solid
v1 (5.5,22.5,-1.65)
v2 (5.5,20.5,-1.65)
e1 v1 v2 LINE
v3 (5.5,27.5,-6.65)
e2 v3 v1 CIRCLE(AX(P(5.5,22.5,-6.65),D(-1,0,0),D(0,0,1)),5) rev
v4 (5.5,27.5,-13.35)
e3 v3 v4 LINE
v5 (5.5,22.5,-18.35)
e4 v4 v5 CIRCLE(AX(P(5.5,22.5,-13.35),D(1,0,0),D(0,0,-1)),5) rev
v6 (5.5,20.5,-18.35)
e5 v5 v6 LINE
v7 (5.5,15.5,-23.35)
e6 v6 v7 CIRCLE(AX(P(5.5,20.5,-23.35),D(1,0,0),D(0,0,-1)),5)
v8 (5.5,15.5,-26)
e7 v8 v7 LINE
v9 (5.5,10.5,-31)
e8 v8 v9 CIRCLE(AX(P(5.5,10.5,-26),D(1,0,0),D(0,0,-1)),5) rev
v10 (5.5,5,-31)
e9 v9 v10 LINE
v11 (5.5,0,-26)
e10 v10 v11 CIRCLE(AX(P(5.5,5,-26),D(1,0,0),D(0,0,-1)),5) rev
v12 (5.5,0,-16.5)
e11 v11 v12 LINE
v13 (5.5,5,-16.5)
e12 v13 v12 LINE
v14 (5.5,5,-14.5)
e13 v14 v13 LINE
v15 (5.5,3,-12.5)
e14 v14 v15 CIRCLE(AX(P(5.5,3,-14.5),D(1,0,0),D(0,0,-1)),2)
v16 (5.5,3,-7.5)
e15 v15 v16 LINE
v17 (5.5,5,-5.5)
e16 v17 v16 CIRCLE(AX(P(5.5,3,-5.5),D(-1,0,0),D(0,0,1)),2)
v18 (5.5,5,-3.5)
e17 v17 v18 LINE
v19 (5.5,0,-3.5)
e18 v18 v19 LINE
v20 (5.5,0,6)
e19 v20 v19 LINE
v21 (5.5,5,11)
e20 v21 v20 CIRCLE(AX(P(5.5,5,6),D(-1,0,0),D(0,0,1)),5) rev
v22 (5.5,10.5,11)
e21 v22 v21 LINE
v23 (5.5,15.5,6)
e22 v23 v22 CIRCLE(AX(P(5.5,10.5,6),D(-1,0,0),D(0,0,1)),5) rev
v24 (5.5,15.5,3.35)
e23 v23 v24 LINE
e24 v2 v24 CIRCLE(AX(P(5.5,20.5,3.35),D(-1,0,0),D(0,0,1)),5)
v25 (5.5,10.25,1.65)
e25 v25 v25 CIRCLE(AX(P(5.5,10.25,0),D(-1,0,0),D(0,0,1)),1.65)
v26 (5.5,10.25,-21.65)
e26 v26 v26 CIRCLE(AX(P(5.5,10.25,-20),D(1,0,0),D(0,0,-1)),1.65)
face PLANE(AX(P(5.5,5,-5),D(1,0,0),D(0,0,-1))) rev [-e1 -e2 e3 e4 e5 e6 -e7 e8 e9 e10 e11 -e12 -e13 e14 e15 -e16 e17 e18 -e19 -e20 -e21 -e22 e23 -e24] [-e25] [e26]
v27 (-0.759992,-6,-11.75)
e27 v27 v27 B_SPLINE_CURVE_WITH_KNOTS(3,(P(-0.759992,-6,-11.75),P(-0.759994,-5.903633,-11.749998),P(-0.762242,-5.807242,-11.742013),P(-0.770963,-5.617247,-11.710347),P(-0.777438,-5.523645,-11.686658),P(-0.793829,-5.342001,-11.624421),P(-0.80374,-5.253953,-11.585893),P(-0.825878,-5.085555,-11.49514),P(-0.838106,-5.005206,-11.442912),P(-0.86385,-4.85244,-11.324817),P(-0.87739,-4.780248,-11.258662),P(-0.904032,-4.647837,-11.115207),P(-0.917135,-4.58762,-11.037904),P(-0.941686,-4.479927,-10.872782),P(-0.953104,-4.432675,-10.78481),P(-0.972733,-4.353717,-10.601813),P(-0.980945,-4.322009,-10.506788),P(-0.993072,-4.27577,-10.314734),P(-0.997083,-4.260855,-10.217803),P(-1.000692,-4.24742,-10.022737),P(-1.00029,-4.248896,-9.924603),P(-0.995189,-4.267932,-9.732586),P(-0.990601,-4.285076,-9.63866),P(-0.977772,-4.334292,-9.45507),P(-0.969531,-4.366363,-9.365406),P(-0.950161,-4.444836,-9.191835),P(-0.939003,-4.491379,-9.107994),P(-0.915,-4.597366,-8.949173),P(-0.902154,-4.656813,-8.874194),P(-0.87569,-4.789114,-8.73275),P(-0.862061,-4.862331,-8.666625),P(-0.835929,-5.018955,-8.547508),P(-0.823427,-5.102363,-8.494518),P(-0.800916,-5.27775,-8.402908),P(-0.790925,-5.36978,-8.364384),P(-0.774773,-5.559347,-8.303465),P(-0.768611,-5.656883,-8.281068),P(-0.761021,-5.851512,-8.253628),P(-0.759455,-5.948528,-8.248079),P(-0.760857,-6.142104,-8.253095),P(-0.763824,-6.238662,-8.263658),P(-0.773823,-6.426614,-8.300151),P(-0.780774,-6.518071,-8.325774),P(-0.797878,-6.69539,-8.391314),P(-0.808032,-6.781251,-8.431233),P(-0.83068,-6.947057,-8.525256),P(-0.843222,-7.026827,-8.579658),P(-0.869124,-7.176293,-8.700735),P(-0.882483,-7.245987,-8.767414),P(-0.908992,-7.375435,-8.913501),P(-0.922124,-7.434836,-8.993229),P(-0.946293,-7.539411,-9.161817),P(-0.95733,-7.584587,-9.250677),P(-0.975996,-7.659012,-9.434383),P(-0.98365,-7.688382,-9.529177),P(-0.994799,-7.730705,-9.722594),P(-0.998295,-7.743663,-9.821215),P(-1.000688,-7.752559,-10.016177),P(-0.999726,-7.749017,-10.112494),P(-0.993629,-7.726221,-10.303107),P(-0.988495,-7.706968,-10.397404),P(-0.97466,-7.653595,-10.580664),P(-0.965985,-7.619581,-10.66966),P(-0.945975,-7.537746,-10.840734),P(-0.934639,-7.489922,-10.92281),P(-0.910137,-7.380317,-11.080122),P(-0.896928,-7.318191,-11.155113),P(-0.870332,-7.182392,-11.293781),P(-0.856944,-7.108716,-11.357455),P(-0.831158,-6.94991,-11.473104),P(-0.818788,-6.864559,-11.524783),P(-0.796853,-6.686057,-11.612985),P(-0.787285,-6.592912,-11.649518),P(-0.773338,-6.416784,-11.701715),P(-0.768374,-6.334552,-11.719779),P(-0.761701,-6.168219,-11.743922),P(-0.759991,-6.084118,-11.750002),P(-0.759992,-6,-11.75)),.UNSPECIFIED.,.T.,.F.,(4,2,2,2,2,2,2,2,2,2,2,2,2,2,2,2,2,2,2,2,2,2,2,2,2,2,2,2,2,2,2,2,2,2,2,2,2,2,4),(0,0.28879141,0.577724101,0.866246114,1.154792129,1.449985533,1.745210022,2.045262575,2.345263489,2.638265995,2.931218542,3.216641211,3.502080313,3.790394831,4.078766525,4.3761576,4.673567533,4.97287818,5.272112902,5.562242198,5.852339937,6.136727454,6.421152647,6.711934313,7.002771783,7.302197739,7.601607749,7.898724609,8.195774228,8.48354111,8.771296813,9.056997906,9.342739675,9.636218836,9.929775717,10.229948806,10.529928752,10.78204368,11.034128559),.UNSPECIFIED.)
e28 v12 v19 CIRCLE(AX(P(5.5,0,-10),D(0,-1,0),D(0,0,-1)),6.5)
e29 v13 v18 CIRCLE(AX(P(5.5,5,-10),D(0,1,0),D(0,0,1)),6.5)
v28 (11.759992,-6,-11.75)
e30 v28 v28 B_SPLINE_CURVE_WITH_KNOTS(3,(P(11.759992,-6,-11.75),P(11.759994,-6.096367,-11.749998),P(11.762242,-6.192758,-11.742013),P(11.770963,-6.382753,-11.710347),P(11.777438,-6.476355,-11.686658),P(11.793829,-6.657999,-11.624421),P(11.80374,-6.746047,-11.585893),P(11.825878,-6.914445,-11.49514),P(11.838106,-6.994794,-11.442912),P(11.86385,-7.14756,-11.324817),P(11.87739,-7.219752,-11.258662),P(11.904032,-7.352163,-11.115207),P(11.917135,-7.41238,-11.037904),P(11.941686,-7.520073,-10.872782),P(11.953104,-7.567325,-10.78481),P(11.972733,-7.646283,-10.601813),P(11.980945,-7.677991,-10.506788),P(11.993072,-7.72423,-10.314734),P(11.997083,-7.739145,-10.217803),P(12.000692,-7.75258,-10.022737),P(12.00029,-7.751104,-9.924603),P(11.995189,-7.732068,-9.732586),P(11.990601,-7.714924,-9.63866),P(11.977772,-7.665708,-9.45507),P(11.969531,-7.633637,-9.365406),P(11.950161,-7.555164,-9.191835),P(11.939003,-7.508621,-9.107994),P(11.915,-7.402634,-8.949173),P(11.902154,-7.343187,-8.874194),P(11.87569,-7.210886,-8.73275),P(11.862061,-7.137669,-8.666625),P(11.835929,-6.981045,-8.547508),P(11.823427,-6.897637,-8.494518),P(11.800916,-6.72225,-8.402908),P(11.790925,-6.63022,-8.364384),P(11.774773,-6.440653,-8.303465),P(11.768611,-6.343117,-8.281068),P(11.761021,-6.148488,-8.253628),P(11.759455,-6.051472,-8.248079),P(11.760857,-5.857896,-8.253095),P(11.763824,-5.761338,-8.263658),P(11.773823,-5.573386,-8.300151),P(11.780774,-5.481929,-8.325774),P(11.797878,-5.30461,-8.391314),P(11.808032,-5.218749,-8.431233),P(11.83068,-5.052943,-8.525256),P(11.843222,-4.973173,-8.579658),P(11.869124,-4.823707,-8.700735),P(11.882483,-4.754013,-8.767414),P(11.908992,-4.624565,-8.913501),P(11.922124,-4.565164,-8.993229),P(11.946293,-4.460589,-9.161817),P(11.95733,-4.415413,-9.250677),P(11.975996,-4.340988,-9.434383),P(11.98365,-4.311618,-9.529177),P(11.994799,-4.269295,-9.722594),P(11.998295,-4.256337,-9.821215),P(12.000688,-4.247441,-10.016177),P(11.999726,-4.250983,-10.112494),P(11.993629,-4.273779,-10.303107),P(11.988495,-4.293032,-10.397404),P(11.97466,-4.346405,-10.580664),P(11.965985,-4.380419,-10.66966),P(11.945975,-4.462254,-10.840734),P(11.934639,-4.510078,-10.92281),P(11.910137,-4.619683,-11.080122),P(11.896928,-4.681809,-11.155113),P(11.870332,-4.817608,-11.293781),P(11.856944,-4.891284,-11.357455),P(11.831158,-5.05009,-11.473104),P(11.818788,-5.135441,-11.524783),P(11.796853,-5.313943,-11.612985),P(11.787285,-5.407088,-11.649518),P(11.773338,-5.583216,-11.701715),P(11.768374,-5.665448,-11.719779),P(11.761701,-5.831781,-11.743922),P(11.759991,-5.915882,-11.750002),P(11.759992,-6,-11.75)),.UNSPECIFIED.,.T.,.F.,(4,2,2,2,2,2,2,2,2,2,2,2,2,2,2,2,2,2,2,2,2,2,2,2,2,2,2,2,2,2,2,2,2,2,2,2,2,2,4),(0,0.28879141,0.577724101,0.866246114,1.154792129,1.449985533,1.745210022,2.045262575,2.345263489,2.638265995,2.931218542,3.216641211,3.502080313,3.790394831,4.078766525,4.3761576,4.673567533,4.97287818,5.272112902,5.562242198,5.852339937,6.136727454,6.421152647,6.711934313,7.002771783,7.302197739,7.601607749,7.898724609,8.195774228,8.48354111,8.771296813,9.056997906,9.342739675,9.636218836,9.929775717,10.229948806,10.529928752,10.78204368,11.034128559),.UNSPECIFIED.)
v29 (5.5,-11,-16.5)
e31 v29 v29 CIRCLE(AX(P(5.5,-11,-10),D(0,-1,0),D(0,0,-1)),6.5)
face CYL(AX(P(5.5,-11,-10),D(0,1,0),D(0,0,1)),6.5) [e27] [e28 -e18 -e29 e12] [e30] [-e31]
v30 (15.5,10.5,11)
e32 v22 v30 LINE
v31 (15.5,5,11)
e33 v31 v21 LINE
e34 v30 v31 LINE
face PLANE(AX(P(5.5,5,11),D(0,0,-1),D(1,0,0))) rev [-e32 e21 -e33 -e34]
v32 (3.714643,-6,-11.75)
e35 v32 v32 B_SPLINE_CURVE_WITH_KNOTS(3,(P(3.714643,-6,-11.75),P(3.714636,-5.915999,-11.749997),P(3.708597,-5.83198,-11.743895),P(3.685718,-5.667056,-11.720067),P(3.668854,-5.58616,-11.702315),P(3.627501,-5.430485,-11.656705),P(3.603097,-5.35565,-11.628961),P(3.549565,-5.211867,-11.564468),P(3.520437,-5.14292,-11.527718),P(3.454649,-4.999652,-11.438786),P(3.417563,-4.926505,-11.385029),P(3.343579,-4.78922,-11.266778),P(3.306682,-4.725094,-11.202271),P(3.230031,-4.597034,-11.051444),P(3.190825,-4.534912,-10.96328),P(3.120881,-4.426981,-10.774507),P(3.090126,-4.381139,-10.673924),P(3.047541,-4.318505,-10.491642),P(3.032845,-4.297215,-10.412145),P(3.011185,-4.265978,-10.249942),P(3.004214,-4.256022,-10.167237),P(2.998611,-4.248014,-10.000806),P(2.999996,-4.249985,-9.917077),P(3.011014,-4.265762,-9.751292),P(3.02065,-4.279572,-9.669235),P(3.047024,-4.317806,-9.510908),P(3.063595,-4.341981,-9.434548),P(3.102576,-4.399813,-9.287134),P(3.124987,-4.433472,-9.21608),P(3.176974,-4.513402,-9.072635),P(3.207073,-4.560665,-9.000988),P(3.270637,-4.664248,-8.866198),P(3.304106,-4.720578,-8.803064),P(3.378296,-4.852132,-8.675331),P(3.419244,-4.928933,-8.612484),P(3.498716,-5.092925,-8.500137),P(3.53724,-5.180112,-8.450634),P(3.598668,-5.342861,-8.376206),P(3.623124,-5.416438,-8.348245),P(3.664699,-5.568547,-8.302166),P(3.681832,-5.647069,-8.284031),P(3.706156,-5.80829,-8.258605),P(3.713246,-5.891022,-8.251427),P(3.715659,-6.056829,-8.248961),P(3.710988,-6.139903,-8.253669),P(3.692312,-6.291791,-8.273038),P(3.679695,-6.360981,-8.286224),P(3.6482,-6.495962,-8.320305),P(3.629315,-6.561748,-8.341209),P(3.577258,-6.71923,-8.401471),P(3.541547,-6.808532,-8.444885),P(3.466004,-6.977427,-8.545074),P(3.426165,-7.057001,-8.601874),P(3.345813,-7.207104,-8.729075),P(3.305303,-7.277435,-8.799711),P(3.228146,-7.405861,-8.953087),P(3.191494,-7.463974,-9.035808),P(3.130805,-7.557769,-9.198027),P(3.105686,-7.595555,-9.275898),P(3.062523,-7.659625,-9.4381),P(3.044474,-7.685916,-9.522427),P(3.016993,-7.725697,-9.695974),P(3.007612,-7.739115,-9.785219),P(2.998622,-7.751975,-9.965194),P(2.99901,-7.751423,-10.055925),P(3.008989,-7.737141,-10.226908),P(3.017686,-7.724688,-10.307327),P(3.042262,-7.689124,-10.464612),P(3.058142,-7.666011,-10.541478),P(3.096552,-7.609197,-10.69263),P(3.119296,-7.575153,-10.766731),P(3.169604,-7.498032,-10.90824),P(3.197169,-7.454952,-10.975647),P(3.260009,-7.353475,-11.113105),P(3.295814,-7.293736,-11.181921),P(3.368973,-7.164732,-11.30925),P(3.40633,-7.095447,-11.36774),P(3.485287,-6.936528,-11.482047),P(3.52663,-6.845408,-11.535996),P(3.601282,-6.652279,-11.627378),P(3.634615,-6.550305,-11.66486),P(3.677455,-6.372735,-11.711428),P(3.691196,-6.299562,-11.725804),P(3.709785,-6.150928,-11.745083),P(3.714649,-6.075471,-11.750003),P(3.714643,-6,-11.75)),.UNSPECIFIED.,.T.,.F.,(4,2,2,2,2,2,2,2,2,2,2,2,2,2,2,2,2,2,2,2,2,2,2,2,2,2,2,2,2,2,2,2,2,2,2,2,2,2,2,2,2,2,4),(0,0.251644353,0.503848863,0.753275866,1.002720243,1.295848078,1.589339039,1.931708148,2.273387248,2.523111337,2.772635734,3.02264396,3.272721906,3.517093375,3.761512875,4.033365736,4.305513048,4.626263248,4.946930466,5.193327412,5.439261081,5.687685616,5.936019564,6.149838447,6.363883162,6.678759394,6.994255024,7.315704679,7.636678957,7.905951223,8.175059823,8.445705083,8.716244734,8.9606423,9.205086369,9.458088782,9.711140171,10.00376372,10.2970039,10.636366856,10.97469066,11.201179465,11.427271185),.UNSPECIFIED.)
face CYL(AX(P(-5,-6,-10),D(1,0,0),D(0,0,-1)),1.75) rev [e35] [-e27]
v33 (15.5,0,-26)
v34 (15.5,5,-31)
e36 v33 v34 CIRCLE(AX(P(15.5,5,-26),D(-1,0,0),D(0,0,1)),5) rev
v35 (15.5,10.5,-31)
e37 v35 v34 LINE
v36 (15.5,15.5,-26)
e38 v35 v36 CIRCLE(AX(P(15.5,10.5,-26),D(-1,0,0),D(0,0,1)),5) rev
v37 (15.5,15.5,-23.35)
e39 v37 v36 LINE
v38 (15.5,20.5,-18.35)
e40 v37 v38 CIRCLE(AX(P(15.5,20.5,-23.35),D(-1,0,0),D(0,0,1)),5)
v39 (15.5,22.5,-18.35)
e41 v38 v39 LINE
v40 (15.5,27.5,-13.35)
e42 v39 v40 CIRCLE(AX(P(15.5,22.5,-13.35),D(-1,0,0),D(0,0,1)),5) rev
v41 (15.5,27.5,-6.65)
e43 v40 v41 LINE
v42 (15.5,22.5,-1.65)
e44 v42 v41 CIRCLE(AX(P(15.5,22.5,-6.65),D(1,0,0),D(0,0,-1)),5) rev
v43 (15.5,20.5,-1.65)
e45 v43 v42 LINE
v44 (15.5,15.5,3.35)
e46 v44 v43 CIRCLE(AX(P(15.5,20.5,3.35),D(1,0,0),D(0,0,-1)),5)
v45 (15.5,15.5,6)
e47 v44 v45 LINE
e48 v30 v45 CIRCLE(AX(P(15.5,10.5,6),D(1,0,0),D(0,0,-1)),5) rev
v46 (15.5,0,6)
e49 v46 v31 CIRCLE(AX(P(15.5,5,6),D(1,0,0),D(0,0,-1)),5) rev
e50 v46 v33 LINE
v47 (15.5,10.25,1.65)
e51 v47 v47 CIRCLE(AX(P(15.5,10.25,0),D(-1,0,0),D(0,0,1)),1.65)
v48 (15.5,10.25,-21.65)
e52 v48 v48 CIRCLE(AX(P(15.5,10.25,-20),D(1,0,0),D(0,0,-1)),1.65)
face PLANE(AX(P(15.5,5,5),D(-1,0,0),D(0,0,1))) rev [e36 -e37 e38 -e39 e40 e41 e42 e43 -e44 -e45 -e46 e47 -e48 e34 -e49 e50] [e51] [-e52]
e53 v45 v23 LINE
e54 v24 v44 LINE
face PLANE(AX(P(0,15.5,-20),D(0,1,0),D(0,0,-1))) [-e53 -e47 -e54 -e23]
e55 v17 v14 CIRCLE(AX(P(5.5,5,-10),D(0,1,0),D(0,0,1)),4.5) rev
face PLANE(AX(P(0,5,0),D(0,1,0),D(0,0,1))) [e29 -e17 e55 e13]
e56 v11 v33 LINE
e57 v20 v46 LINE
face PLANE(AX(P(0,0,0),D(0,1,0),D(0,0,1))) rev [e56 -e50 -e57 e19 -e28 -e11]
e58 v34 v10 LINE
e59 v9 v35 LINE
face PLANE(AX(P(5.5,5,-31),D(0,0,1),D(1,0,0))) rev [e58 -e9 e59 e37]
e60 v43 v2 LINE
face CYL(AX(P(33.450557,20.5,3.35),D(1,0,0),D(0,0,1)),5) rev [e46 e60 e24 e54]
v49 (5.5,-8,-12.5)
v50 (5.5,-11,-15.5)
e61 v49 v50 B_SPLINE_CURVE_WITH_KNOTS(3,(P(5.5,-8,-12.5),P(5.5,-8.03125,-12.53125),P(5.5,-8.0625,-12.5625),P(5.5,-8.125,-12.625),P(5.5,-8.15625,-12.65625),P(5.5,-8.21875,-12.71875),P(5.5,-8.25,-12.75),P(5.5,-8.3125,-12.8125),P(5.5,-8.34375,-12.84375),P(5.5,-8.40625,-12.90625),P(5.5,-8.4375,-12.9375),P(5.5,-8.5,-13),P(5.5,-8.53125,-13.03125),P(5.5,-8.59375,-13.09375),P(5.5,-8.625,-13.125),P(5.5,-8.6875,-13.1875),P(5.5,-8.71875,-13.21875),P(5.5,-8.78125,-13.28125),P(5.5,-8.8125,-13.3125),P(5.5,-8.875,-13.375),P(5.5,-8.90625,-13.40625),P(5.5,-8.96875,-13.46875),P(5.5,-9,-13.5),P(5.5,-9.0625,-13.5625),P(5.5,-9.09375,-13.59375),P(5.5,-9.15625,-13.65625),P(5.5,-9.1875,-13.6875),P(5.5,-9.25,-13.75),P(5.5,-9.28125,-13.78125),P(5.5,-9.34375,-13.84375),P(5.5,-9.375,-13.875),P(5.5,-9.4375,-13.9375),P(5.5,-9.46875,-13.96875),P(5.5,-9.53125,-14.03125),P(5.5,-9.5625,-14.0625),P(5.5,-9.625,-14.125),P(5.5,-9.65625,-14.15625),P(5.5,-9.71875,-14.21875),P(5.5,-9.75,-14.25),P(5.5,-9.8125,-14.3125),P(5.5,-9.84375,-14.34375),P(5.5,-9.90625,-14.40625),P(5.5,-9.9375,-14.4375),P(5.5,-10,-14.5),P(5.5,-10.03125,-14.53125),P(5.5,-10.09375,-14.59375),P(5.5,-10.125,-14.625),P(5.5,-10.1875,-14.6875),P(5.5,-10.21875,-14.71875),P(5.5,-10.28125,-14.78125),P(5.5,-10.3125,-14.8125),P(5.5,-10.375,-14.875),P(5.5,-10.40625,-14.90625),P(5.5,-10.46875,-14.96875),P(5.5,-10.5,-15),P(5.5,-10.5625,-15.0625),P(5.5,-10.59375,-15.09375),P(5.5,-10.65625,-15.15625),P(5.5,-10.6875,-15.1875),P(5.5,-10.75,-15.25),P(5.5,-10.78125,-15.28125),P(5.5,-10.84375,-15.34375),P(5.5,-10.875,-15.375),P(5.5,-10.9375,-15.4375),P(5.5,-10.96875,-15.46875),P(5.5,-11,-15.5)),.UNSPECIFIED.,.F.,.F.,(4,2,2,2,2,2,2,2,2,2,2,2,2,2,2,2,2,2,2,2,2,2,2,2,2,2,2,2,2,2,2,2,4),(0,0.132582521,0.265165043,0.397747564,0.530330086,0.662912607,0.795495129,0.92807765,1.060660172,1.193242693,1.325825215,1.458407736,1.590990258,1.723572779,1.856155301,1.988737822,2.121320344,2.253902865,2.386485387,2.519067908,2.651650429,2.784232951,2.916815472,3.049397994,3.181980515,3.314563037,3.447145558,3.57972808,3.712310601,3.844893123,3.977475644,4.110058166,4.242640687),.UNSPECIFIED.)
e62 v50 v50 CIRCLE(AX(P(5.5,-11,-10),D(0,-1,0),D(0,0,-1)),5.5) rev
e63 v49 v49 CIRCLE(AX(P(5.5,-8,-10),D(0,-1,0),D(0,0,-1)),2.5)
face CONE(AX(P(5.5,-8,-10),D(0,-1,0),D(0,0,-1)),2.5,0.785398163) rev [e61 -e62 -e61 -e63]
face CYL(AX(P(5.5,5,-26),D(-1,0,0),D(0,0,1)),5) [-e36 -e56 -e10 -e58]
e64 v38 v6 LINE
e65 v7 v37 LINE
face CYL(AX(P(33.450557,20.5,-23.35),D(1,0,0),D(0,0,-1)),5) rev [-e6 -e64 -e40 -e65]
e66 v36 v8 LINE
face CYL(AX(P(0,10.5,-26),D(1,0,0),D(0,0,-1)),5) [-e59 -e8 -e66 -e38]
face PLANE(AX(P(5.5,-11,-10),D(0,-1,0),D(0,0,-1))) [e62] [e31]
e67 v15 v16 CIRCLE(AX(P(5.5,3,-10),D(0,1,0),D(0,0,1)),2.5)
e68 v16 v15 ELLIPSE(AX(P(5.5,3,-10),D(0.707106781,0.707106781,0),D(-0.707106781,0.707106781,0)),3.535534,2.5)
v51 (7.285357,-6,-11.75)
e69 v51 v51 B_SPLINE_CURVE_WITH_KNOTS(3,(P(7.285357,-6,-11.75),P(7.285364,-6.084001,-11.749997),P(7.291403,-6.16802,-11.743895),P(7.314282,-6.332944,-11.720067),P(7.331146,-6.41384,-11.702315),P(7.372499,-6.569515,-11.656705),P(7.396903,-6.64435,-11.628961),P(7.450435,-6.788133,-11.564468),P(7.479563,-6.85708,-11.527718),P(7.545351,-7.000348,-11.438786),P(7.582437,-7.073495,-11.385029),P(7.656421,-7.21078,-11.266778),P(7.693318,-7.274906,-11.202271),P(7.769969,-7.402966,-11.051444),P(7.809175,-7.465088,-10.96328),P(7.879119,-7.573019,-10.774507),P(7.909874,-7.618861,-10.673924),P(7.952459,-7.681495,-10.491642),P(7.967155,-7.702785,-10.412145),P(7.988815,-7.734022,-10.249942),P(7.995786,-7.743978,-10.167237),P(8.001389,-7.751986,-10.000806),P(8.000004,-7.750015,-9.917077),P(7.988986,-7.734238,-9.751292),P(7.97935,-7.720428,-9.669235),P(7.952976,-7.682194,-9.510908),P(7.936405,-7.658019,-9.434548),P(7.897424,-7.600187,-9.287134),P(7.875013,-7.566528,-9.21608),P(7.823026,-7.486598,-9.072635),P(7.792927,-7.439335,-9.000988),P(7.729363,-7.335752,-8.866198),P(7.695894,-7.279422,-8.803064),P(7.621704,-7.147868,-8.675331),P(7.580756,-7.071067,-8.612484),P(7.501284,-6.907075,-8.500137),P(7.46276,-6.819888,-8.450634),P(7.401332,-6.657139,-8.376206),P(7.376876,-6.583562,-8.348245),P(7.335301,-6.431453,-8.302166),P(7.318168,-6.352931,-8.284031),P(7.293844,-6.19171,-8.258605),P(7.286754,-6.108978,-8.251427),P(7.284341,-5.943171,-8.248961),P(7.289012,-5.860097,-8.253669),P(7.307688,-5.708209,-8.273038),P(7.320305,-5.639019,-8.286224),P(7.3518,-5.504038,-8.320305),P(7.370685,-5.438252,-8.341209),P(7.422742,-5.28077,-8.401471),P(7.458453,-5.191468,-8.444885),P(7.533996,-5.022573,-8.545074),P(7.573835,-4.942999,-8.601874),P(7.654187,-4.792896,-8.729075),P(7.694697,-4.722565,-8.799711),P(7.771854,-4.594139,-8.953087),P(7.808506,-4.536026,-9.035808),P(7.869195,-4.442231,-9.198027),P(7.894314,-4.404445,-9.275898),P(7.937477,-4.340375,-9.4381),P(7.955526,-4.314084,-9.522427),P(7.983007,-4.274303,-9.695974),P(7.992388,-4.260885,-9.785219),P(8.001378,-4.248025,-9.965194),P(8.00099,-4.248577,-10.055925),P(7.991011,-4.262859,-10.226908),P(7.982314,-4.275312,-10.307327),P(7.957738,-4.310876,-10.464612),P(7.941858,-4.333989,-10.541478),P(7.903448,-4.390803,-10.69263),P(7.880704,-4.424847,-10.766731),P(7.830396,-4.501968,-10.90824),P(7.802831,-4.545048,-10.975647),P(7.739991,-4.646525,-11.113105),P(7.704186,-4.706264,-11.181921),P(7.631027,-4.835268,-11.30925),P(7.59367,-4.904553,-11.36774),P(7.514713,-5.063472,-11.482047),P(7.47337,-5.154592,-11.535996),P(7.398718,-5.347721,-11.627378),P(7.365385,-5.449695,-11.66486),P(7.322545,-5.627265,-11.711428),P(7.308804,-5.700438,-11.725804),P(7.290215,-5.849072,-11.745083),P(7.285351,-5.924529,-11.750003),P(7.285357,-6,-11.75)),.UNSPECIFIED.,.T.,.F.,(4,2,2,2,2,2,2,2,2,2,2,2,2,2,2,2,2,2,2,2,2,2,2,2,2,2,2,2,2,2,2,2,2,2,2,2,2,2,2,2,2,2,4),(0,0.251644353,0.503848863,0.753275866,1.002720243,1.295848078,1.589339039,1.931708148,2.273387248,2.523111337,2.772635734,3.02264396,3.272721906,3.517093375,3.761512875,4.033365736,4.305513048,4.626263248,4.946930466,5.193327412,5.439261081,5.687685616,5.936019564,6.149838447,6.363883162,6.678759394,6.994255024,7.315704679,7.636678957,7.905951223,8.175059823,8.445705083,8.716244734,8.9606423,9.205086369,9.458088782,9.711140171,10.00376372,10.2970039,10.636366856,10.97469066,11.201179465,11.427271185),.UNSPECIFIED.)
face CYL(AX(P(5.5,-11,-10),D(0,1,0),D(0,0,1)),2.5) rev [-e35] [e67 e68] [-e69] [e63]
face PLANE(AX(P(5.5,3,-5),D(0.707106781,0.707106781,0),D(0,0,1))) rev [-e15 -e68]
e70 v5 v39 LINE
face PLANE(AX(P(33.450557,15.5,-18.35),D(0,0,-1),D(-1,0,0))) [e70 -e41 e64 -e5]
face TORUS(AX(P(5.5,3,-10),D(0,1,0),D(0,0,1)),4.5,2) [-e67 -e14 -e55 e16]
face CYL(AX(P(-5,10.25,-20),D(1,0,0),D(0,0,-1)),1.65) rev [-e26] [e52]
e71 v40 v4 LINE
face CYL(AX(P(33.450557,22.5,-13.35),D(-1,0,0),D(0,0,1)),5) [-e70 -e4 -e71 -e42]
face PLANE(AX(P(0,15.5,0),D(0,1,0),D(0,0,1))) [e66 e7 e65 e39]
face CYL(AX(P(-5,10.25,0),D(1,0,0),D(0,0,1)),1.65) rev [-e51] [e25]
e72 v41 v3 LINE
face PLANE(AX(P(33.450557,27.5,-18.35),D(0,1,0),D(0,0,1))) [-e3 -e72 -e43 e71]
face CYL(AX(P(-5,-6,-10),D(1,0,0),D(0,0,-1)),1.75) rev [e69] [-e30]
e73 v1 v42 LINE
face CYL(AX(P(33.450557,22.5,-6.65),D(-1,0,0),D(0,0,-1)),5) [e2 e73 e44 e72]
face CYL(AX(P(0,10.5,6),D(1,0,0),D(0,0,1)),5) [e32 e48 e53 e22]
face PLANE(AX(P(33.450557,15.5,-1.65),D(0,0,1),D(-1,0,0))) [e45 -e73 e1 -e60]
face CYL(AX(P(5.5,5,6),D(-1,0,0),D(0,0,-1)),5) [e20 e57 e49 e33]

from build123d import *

# Parameters (mm, degrees)
SKETCH1_R               = 1.75
BOSS_EXTRUDE1_DEPTH     = 5
SKETCH2_W               = 10
SKETCH2_H               = 36
BOSS_EXTRUDE2_DEPTH     = 10.5
SKETCH3_R               = 1.75
BOSS_EXTRUDE3_DEPTH     = 5
FILLET1_R               = 5
SKETCH4_R               = 1.65
CUT_EXTRUDE1_DEPTH      = 43.444080859
SKETCH5_R               = 6.5
SKETCH5_R_2             = 2.5
BOSS_EXTRUDE4_DEPTH     = 11
BOSS_EXTRUDE5_START     = 5
BOSS_EXTRUDE5_DEPTH     = 5
CUT_EXTRUDE2_DEPTH      = 41.267853183
CUT_EXTRUDE2_DEPTH_BACK = 41.267853183
SKETCH7_R               = 1.75
FILLET2_R               = 5
FILLET3_R               = 5
SKETCH9_W               = 13.35
SKETCH9_H               = 12
BOSS_EXTRUDE6_DEPTH     = 10
CHAMFER2_SIZE           = 3
CHAMFER3_SIZE           = 3
FILLET6_R               = 2
SKETCH14_R              = 1.75
BOSS_EXTRUDE9_DEPTH     = 7
FILLET7_R               = 10
CUT_EXTRUDE7_DEPTH      = 52.802509666
CUT_EXTRUDE7_DEPTH_BACK = 52.802509666
CUT_EXTRUDE8_START      = -12
CUT_EXTRUDE8_DEPTH      = 12
SKETCH19_W              = 10
SKETCH19_H              = 15.5
BOSS_EXTRUDE10_DEPTH    = 10
BOSS_EXTRUDE11_START    = -27.5
BOSS_EXTRUDE11_DEPTH    = 27.5
CUT_EXTRUDE9_DEPTH      = 25
FILLET10_R              = 5


# Read off the part's stored shape, not the designer's step: Cut-Extrude8, Cut-Extrude9
with BuildPart() as part:
    # Sketch1 → Boss-Extrude1 (new body)
    with BuildSketch(Plane(origin=(0, 0, 0), x_dir=(1, 0, 0), z_dir=(0, 1, 0))):
        with BuildLine():
            Line((0, 5), (5.5, 5))
            Line((5.5, 5), (5.5, 31))
            Line((5.5, 31), (15.5, 31))
            Line((15.5, 31), (15.5, -5))
            Line((15.5, -5), (5.5, -5))
            Line((5.5, -5), (0, -5))
            ThreePointArc((0, -5), (-5, 0), (0, 5))
        make_face()
        with Locations(Location((0, 0, 0), (0, 0, 270))):
            Circle(SKETCH1_R, mode=Mode.SUBTRACT)
    extrude(amount=BOSS_EXTRUDE1_DEPTH)

    # Sketch2 → Boss-Extrude2 (add)
    with BuildSketch(Plane(origin=(0, 5, 0), x_dir=(1, 0, 0), z_dir=(0, 1, 0))):
        with Locations((10.5, 13)):
            Rectangle(SKETCH2_W, SKETCH2_H)
    extrude(amount=BOSS_EXTRUDE2_DEPTH)

    # Sketch3 → Boss-Extrude3 (add)
    with BuildSketch(Plane(origin=(0, 15.5, 0), x_dir=(1, 0, 0), z_dir=(0, 1, 0))):
        with BuildLine():
            Line((5.5, 5), (15.5, 5))
            Line((15.5, 5), (15.5, -5))
            Line((15.5, -5), (5.5, -5))
            Line((5.5, -5), (0, -5))
            ThreePointArc((0, -5), (-5, 0), (0, 5))
            Line((0, 5), (5.5, 5))
        make_face()
        with Locations(Location((0, 0, 0), (0, 0, 270))):
            Circle(SKETCH3_R, mode=Mode.SUBTRACT)
    extrude(amount=BOSS_EXTRUDE3_DEPTH)

    # Fillet1
    fillet1_edges = [part.edges().sort_by_distance(p)[0] for p in [
        (15.5, 10.25, 5),
    ]]
    fillet(fillet1_edges, radius=FILLET1_R)

    # Sketch4 → Cut-Extrude1 (cut, through all)
    with BuildSketch(Plane(origin=(15.5, 0, 0), x_dir=(0, 0, -1), z_dir=(1, 0, 0))):
        with Locations((20, 10.25)):
            Circle(SKETCH4_R)
    extrude(amount=-CUT_EXTRUDE1_DEPTH, mode=Mode.SUBTRACT)

    # Sketch5 → Boss-Extrude4 (add)
    with BuildSketch(Plane.XZ):
        with Locations(Location((5.5, -10, 0), (0, 0, 270))):
            Circle(SKETCH5_R)
        with Locations(Location((5.5, -10, 0), (0, 0, 270))):
            Circle(SKETCH5_R_2, mode=Mode.SUBTRACT)
    extrude(amount=BOSS_EXTRUDE4_DEPTH)

    # Sketch6 → Boss-Extrude5 (add)
    with BuildSketch(Plane(origin=(0, 0, 0), x_dir=(1, 0, 0), z_dir=(0, 1, 0)).offset(BOSS_EXTRUDE5_START)):
        with BuildLine():
            Line((5.5, 12.5), (5.5, 16.5))
            ThreePointArc((5.5, 16.5), (-0.61350963, 12.207940217), (1.346688069, 5))
            Line((1.346688069, 5), (5.5, 5))
            Line((5.5, 5), (5.5, 7.5))
            ThreePointArc((5.5, 7.5), (3, 10), (5.5, 12.5))
        make_face()
    extrude(amount=-BOSS_EXTRUDE5_DEPTH)

    # Sketch7 → Cut-Extrude2 (cut, two sides: drawn at the far end of the back side and taken through both)
    with BuildSketch(Plane(origin=(0, 0, 0), x_dir=(0, 0, -1), z_dir=(1, 0, 0)).offset(-CUT_EXTRUDE2_DEPTH_BACK)):
        with Locations((10, -6)):
            Circle(SKETCH7_R)
    extrude(amount=CUT_EXTRUDE2_DEPTH + CUT_EXTRUDE2_DEPTH_BACK, mode=Mode.SUBTRACT)

    # Fillet2
    fillet2_edges = [part.edges().sort_by_distance(p)[0] for p in [
        (10.5, 15.5, -31),
        (10.5, 0, -31),
    ]]
    fillet(fillet2_edges, radius=FILLET2_R)

    # Fillet3
    # the kernel refuses this fillet: 5 mm, written as the material it adds along each edge
    with BuildSketch(Plane(origin=(15.5, 15.5, -5), x_dir=(0, 0, -1), z_dir=(-1, 0, 0))) as fillet3_piece_1:
        with BuildLine():
            CenterArc((FILLET3_R, -FILLET3_R), FILLET3_R, 90, 90)
            Line((0, -FILLET3_R), (0, 0))
            Line((0, 0), (FILLET3_R, 0))
        make_face()
    extrude(amount=10)

    # Sketch9 → Boss-Extrude6 (add)
    with BuildSketch(Plane.ZY.offset(-5.5)):
        with Locations((-11.675, 21.5)):
            Rectangle(SKETCH9_W, SKETCH9_H)
    extrude(amount=-BOSS_EXTRUDE6_DEPTH)

    # Chamfer2
    chamfer2_edges = [part.edges().sort_by_distance(p)[0] for p in [
        (5.5, -11, -7.5),
    ]]
    chamfer(chamfer2_edges, length=CHAMFER2_SIZE)

    # Chamfer3
    # the kernel refuses this chamfer: 3 mm, written as the material it takes off along each edge
    with BuildSketch(Plane(origin=(5.5, 0, 0.215048964), x_dir=(-0.02749587661058649, 0.9996219169112968, 0), z_dir=(0, 0, -1))) as chamfer3_piece_1_section:
        Polygon((CHAMFER3_SIZE * 0.999621916911, CHAMFER3_SIZE * 0.0274958766106), (-CHAMFER3_SIZE * 0.0274958766106, CHAMFER3_SIZE * 0.999621916911), (0, 0), align=None)
    chamfer3_piece_1 = extrude(amount=20.430097928, mode=Mode.PRIVATE)
    chamfer3_piece_1 = chamfer3_piece_1 & Plane(origin=(5.5, 1.082097371, -10), x_dir=(0, 0, 1), z_dir=(0, 1, 0)) * Cylinder(2.5, 53, mode=Mode.PRIVATE)
    add(chamfer3_piece_1, mode=Mode.SUBTRACT)

    # Fillet6
    fillet6_edges = [part.edges().sort_by_distance(p)[0] for p in [
        (3, 5, -10),
    ]]
    fillet(fillet6_edges, radius=FILLET6_R)

    # Sketch14 → Boss-Extrude9 (add)
    with BuildSketch(Plane(origin=(0, 20.5, 0), x_dir=(1, 0, 0), z_dir=(0, 1, 0))):
        with BuildLine():
            Line((0, -5), (10.5, -5))
            ThreePointArc((10.5, -5), (14.035533906, -3.535533906), (15.5, 0))
            Line((15.5, 0), (15.5, 5))
            Line((15.5, 5), (5.5, 5))
            Line((5.5, 5), (0, 5))
            ThreePointArc((0, 5), (-5, 0), (0, -5))
        make_face()
        with Locations(Location((0, 0, 0), (0, 0, 270))):
            Circle(SKETCH14_R, mode=Mode.SUBTRACT)
    extrude(amount=BOSS_EXTRUDE9_DEPTH)

    # Fillet7
    # the kernel refuses this fillet: 10 mm, written as the material it adds along each edge
    with BuildSketch(Plane(origin=(1.346688069, 5, -5), x_dir=(-0.41939386698079784, 0, -0.9078043755891976), z_dir=(0, -1, 0))) as fillet7_piece_1:
        with BuildLine():
            CenterArc((9.89760177, -9.026713968), FILLET7_R, 115.488537073, 42.147981554)
            Line((0.649714482, -5.22190376), (-0.275074246, -4.841422739))
            ThreePointArc((-0.275074246, -4.841422739), (-0.343011659, -1.641923188), (-0.907804376, -0.419393867))
            Line((-0.907804376, -0.419393867), (0.430330512, 0.902671397))
            ThreePointArc((0.430330512, 0.902671397), (2.797148326, 0.367364079), (5.163966141, 0.902671397))
            Line((5.163966141, 0.902671397), (5.594296652, 0))
        make_face()
    extrude(amount=5)

    # Sketch17 → Cut-Extrude7 (cut, two sides: drawn at the far end of the back side and taken through both)
    with BuildSketch(Plane(origin=(0, 27.5, 0), x_dir=(1, 0, 0), z_dir=(0, 1, 0)).offset(-CUT_EXTRUDE7_DEPTH_BACK)):
        with BuildLine():
            Line((5.5, 3.5), (5.5, -5))
            Line((5.5, -5), (0, -5))
            ThreePointArc((0, -5), (-4.582515477, -2.000137971), (-3.666265283, 3.399779239))
            ThreePointArc((-3.666265283, 3.399779239), (-1.711748558, 6.491136994), (-0.999525638, 10.078526979))
            ThreePointArc((-0.999525638, 10.078526979), (0.876125793, 5.431653766), (5.5, 3.5))
        make_face()
    extrude(amount=CUT_EXTRUDE7_DEPTH + CUT_EXTRUDE7_DEPTH_BACK, mode=Mode.SUBTRACT)

    # Cut-Extrude8 outline → Cut-Extrude8 (cut)
    with BuildSketch(Plane.XZ.offset(-15.5).offset(CUT_EXTRUDE8_START)):
        with BuildLine():
            Line((1.346688069, -5), (5.5, -5))
            Line((5.5, -5), (5.5, -3.5))
            ThreePointArc((5.5, -3.5), (3.292059784, -3.88649037), (1.346688069, -5))
        make_face()
    extrude(amount=CUT_EXTRUDE8_DEPTH, mode=Mode.SUBTRACT)

    # Sketch19 → Boss-Extrude10 (add)
    with BuildSketch(Plane.ZY.offset(-5.5)):
        with Locations((10, 7.75)):
            Rectangle(SKETCH19_W, SKETCH19_H)
    extrude(amount=-BOSS_EXTRUDE10_DEPTH)

    # Sketch20 → Boss-Extrude11 (add)
    with BuildSketch(Plane.XZ.offset(BOSS_EXTRUDE11_START)):
        with BuildLine():
            Line((15.5, 5), (15.5, 0))
            ThreePointArc((15.5, 0), (14.035533906, 3.535533906), (10.5, 5))
            Line((10.5, 5), (15.5, 5))
        make_face()
    extrude(amount=BOSS_EXTRUDE11_DEPTH)

    # Cut-Extrude9 outline → Cut-Extrude9 (cut)
    with BuildSketch(Plane(origin=(0, 0, -10), x_dir=(0, 1, 0), z_dir=(0, 0, 1))):
        Polygon((5, 1), (-11, 1), (-11, -15.5), (27.5, -15.5), (27.5, -5.5), (5, -5.5), align=None)
    extrude(amount=CUT_EXTRUDE9_DEPTH, mode=Mode.SUBTRACT)

    # Fillet10
    fillet10_edges = [part.edges().sort_by_distance(p)[0] for p in [
        (10.5, 15.5, -18.35),
        (10.5, 27.5, -18.35),
    ]]
    fillet(fillet10_edges, radius=FILLET10_R)

    # Mirror1: part across plane


with BuildPart() as part_1:
    add(part.part)
    add(part.part.mirror(Plane.XY.offset(-10)))


solid = part_1.part
